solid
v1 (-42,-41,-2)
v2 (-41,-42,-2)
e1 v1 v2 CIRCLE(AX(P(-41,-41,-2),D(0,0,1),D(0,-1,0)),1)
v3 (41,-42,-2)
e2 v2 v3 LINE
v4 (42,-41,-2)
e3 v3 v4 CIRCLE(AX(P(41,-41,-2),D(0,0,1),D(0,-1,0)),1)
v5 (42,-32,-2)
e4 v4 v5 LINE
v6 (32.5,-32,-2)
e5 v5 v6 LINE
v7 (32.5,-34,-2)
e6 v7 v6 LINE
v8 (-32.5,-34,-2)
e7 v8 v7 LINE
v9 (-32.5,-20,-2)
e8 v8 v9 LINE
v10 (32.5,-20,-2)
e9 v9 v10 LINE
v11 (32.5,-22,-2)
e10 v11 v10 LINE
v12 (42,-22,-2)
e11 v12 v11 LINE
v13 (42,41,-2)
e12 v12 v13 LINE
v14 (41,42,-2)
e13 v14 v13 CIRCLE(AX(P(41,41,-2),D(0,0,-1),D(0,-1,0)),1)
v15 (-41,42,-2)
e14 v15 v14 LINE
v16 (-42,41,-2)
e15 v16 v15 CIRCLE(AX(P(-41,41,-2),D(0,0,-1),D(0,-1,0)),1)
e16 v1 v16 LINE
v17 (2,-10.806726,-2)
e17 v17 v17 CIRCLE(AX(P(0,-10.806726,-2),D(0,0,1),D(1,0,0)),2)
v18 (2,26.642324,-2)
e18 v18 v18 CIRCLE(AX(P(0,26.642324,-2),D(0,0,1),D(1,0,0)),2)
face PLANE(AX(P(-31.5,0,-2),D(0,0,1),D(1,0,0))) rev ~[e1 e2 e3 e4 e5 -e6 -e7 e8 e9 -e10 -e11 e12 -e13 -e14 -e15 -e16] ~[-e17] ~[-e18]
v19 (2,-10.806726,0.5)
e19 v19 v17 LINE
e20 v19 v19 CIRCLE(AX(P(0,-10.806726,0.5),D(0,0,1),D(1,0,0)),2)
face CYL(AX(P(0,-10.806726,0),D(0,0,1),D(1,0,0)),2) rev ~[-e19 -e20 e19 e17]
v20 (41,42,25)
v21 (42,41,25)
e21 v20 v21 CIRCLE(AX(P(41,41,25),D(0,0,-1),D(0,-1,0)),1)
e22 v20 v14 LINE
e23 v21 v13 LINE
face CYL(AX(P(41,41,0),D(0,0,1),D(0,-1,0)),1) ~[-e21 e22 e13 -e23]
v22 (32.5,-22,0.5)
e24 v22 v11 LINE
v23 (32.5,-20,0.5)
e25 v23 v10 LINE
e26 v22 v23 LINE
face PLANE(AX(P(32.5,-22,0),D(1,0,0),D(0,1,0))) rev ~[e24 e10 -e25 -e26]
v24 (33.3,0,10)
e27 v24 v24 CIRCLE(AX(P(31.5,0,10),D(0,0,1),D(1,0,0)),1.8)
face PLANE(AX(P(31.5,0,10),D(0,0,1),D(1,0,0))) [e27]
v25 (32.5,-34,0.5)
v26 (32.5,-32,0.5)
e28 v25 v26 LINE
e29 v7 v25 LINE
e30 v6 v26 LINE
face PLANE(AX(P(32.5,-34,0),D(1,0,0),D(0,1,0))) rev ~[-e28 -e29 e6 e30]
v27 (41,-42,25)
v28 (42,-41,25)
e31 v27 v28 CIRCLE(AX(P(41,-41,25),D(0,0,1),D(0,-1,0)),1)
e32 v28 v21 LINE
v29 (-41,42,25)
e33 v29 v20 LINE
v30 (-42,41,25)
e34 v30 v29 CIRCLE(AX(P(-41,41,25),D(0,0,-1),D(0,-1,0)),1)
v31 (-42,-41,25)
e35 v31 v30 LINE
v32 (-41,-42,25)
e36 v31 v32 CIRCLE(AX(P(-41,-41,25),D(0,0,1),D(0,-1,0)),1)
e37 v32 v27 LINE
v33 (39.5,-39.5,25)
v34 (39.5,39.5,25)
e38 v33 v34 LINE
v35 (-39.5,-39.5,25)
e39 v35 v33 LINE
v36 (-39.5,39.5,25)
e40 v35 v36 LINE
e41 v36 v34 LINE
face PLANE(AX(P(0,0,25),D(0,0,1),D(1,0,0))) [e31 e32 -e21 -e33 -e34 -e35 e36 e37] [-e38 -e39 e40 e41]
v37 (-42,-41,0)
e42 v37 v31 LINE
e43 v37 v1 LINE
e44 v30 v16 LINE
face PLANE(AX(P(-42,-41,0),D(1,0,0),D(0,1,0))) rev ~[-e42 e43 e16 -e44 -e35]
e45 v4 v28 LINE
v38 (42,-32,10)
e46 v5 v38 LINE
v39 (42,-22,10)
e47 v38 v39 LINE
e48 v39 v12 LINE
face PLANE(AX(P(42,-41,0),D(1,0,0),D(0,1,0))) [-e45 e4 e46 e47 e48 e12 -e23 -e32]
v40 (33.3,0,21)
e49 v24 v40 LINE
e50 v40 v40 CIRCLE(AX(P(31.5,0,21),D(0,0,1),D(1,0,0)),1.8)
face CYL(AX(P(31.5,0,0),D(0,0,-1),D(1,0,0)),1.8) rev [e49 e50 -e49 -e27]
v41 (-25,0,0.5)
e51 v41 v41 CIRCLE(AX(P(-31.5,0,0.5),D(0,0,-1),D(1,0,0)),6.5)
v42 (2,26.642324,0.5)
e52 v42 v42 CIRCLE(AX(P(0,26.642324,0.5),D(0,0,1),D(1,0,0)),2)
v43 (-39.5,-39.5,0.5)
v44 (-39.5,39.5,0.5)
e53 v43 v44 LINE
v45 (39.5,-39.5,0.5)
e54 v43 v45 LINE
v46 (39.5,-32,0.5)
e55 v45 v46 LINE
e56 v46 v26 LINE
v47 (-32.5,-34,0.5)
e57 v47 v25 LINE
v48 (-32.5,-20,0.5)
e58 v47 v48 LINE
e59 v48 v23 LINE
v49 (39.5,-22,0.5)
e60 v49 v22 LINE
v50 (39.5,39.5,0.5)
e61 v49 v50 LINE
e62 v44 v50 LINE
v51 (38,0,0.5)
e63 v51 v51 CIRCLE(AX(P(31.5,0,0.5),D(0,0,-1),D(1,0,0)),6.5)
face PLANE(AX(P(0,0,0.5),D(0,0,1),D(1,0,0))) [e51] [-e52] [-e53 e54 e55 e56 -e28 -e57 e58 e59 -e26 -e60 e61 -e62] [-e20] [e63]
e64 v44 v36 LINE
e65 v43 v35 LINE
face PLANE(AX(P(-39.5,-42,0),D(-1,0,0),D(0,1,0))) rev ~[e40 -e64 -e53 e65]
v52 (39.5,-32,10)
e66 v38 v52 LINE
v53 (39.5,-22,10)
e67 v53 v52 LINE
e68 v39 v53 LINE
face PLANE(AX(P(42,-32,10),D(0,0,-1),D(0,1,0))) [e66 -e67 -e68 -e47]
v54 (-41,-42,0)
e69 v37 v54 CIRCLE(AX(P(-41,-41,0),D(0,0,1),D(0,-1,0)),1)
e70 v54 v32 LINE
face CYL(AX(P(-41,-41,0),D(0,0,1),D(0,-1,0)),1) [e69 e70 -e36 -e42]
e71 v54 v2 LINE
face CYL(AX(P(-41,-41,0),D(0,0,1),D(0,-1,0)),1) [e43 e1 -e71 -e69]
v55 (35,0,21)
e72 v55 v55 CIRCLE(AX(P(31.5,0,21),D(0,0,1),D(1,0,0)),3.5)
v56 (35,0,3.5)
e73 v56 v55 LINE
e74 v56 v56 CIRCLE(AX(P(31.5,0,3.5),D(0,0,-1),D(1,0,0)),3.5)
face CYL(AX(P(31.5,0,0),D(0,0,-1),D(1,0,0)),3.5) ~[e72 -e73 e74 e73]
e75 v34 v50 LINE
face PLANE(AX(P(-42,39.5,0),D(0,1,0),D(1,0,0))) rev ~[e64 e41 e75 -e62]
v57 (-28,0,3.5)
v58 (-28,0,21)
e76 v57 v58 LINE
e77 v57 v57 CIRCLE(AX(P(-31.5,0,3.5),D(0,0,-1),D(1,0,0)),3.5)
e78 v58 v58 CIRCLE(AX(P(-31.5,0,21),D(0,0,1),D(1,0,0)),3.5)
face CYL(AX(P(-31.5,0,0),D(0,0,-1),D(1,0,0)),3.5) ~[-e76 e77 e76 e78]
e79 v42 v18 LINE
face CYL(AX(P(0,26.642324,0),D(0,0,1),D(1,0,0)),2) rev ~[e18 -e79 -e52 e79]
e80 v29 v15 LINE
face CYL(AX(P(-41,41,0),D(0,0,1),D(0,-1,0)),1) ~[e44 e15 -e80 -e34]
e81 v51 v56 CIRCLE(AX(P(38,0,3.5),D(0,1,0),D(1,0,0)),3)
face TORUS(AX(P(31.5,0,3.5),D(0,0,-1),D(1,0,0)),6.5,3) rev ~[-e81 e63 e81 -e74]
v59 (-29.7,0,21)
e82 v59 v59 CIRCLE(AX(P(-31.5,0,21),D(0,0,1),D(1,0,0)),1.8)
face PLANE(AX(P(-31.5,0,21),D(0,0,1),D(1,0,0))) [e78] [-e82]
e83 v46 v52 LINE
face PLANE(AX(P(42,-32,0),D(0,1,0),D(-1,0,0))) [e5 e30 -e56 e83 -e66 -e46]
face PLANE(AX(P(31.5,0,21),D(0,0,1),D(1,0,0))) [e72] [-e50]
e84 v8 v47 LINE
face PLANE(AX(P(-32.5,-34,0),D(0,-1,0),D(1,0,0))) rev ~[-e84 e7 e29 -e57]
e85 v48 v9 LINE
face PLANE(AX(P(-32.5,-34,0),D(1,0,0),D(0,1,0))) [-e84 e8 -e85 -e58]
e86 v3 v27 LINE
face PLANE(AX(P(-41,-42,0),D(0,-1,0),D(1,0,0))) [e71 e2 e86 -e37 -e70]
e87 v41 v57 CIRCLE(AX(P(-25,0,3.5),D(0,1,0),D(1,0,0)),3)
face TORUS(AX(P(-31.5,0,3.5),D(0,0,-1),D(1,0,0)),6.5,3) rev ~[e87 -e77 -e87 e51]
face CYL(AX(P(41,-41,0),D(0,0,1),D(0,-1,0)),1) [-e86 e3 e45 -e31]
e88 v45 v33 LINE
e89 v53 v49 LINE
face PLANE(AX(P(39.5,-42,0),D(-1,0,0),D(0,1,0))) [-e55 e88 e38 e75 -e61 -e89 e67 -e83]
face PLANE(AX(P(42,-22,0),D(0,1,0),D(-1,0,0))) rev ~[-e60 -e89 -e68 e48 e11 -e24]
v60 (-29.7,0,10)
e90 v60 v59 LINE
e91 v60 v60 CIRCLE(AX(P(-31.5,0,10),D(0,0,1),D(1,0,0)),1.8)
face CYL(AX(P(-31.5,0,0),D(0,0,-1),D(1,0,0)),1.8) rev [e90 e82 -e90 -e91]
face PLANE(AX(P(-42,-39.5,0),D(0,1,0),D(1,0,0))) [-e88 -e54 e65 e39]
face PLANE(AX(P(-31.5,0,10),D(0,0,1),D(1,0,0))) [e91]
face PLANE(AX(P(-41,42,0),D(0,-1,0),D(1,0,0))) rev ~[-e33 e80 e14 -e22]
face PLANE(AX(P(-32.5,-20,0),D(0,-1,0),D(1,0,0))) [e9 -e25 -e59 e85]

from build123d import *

# Parameters (mm, degrees)
F0_W      = 84
F0_H      = 84
F1_DEPTH  = 27
F2_T      = -2.5
F3_DEPTH  = 2
F4_W      = 65
F4_H      = 14
F5_DEPTH  = 25
F6_W      = 10
F6_H      = 10
F7_DEPTH  = 21.8
F4_R      = 2
F8_DEPTH  = 25
F9_DEPTH  = 2
F10_R     = 3.5
F10_R_2   = 1.8
F11_DEPTH = 21
F12_DEPTH = 10
F13_R     = 1
F14_DEPTH = 2
F15_R     = 3


# Not quite as in the source:
# - a feature names something its author has since deleted; it is built from what else it names


with BuildPart() as f1:
    # F0 (on Top) → F1 (new body)
    with BuildSketch(Plane.XY):
        Rectangle(F0_W, F0_H)
    extrude(amount=F1_DEPTH)

    # F2
    f2_openings = [f1.faces().sort_by_distance(p)[0] for p in [
        (0, 0, 27),
    ]]
    offset(amount=F2_T, openings=f2_openings)

    # F3 (cut): a face of the model
    f3_faces = [f1.faces().sort_by_distance(p)[0] for p in [
        (0, 0, 2.5),
    ]]
    extrude(f3_faces, amount=F3_DEPTH, mode=Mode.SUBTRACT)

    # F4 (on face) → F5 (cut)
    with BuildSketch(Plane.XY.offset(2.5)):
        with Locations((0, -27)):
            Rectangle(F4_W, F4_H)
    extrude(amount=-F5_DEPTH, mode=Mode.SUBTRACT)

    # F6 (on face) → F7 (cut)
    with BuildSketch(Plane.YZ.offset(42)):
        with Locations((-27, 5)):
            Rectangle(F6_W, F6_H)
    extrude(amount=-F7_DEPTH, mode=Mode.SUBTRACT)

    # F4 (on face) → F8 (cut)
    with BuildSketch(Plane.XY.offset(2.5)):
        with Locations((0, 26.6423244029)):
            Circle(F4_R)
        with Locations((0, -10.8067262918)):
            Circle(F4_R)
    extrude(amount=-F8_DEPTH, mode=Mode.SUBTRACT)

    # F9 (cut): faces of the model
    f9_faces = [f1.faces().sort_by_distance(p)[0] for p in [
        (0, 40.8120606076, 27),
        (-0.4812956241, 5.0155977429, 2.5),
    ]]
    extrude(f9_faces, amount=-F9_DEPTH, mode=Mode.SUBTRACT)

    # F10 (on Top) → F11 (join)
    with BuildSketch(Plane.XY):
        with Locations((-31.5, 0)):
            Circle(F10_R)
        with Locations((-31.5, 0)):
            Circle(F10_R_2, mode=Mode.SUBTRACT)
        with Locations((31.5, 0)):
            Circle(F10_R)
        with Locations((31.5, 0)):
            Circle(F10_R_2, mode=Mode.SUBTRACT)
    extrude(amount=F11_DEPTH)

    # F10 (on Top) → F12 (join)
    with BuildSketch(Plane.XY):
        with Locations((-31.5, 0)):
            Circle(F10_R_2)
        with Locations((31.5, 0)):
            Circle(F10_R_2)
    extrude(amount=F12_DEPTH)

    # F13
    f13_edges = [f1.edges().sort_by_distance(p)[0] for p in [
        (-42, 42, 12.5),
        (42, 42, 12.5),
        (42, -42, 12.5),
        (-42, -42, 12.5),
    ]]
    fillet(f13_edges, radius=F13_R)

    # F14 (add): a face of the model
    f14_faces = [f1.faces().sort_by_distance(p)[0] for p in [
        (-0.5873435355, 4.470699491, 0),
    ]]
    extrude(f14_faces, amount=F14_DEPTH)

    # F15
    f15_edges = [f1.edges().sort_by_distance(p)[0] for p in [
        (-35, 0, 0.5),
        (28, 0, 0.5),
    ]]
    fillet(f15_edges, radius=F15_R)


solid = f1.part
